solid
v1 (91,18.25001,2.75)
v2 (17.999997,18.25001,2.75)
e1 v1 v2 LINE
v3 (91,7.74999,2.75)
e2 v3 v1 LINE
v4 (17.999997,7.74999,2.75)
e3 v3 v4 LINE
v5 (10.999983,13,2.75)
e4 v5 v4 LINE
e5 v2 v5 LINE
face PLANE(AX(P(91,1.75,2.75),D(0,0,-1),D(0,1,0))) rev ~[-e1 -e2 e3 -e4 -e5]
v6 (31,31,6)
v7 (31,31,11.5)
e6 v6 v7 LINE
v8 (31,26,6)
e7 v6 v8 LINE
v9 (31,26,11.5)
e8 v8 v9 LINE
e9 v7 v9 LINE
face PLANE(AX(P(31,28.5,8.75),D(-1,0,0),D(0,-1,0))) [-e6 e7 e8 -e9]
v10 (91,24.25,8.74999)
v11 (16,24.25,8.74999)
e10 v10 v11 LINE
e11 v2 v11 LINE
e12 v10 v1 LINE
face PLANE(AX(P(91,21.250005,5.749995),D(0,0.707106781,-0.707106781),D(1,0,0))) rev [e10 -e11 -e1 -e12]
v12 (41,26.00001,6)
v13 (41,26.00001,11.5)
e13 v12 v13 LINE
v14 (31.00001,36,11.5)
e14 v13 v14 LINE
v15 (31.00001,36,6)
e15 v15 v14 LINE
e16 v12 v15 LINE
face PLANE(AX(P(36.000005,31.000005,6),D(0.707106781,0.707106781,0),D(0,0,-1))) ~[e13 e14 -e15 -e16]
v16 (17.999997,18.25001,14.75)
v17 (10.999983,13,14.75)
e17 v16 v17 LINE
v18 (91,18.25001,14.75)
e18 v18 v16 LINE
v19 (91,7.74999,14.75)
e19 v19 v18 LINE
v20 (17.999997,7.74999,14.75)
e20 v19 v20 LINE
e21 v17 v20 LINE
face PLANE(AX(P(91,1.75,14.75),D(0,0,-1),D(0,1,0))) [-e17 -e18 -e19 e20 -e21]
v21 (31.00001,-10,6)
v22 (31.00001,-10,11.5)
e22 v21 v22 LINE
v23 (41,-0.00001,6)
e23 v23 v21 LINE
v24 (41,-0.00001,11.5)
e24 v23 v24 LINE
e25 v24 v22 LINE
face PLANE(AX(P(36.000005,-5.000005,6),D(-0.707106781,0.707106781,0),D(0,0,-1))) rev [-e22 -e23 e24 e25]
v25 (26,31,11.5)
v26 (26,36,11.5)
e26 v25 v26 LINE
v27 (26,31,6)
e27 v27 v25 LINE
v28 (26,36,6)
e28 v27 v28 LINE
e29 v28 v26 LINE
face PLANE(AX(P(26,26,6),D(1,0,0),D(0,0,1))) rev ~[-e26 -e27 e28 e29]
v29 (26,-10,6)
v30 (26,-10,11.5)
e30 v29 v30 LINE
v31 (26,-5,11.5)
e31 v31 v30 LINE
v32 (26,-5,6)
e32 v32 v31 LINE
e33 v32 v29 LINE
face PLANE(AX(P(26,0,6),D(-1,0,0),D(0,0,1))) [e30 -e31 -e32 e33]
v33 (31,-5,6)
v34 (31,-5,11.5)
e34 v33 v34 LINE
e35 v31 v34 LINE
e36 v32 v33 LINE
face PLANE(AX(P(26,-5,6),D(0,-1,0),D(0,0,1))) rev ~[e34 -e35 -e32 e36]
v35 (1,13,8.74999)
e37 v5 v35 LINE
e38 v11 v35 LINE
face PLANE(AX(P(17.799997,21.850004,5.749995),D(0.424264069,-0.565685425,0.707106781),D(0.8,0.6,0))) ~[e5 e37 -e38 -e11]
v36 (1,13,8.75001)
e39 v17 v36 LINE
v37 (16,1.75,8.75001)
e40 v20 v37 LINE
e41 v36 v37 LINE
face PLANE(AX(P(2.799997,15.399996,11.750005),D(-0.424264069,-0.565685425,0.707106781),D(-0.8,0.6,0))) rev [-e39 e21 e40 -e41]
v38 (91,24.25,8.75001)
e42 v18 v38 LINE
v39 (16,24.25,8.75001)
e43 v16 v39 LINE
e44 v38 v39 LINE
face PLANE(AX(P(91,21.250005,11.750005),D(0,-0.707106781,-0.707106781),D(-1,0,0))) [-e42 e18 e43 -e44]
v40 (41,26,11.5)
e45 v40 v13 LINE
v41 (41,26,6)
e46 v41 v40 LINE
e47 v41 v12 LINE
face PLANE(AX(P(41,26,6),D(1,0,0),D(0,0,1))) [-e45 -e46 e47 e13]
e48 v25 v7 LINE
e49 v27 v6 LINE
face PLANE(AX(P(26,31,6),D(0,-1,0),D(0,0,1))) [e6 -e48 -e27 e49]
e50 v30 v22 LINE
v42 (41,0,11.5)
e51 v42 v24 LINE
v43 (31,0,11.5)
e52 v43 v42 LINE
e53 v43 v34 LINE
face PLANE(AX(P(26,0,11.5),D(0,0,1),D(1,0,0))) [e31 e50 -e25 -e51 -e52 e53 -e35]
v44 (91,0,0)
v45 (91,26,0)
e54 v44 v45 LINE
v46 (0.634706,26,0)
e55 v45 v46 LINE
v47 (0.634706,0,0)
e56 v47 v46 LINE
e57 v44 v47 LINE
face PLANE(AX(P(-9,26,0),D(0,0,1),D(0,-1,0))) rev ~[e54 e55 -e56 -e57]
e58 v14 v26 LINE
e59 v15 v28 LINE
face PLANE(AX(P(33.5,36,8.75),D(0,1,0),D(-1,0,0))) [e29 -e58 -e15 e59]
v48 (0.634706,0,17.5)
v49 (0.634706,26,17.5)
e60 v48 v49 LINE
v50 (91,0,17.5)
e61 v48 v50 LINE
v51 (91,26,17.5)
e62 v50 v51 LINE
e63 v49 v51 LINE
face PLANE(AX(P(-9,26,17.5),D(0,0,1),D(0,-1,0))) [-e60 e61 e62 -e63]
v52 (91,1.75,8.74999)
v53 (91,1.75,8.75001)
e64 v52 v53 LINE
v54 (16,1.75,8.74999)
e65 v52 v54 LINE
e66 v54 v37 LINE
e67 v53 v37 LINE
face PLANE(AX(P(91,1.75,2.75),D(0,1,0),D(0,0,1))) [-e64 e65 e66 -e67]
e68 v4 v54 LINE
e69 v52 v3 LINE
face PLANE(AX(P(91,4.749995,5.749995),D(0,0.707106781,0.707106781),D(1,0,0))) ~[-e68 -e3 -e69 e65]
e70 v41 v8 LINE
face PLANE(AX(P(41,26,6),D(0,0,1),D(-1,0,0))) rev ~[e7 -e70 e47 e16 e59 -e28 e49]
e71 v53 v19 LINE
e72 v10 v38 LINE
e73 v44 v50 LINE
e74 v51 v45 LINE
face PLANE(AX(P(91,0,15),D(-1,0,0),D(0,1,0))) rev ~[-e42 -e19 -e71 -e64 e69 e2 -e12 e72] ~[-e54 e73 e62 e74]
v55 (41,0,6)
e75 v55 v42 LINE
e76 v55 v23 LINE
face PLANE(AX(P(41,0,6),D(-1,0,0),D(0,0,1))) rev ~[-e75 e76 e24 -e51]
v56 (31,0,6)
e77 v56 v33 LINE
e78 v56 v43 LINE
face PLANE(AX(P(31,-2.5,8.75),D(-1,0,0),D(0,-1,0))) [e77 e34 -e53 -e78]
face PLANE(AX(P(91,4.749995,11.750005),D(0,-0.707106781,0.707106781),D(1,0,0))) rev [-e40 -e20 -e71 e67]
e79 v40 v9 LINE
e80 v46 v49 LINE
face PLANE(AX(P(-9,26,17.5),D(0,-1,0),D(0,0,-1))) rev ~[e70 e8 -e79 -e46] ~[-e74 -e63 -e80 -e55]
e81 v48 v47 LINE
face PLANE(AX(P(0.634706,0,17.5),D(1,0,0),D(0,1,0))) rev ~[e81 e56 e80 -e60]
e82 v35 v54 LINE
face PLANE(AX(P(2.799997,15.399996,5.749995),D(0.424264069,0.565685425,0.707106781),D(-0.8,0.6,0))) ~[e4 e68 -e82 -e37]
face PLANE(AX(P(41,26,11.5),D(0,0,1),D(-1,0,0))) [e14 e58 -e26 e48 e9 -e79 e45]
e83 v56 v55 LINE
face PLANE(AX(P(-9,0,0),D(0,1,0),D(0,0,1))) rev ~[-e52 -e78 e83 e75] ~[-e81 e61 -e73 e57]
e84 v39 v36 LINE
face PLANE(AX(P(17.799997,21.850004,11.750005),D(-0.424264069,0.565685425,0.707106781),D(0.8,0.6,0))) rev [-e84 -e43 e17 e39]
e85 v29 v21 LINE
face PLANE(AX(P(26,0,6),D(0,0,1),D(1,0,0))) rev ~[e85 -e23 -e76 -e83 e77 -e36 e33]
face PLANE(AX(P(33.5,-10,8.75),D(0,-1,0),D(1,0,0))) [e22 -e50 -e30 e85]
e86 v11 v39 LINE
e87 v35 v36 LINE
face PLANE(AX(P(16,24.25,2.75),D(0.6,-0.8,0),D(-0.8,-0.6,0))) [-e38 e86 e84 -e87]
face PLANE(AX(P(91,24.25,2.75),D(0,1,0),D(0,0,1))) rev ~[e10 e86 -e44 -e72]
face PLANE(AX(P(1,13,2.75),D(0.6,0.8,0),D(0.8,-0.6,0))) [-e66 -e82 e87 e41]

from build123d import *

# Parameters (mm, degrees)
F1_DEPTH  = 10
F2_W      = 21
F2_H      = 10
F3_DEPTH  = 9
F4_DEPTH  = 2
F5_DEPTH  = 3
F6_DEPTH  = 5
F7_DEPTH  = 2.5
F8_W      = 22.5
F8_H      = 12
F9_DEPTH  = 75
F11_DEPTH = 12
F12_SIZE  = 5.99999
F13_W     = 15
F13_H     = 5.5
F14_DEPTH = 10
F15_SIZE  = 9.99999
F16_W     = 5
F16_H     = 5.5
F17_DEPTH = 5
F18_W     = 15
F18_H     = 5.5
F19_DEPTH = 10
F20_SIZE  = 9.99999
F21_W     = 5
F21_H     = 5.5
F22_DEPTH = 5
F23_DEPTH = 5
F24_SIZE  = 5
F25_DEPTH = 5
F29_DEPTH = 25


# Not quite as in the source:
# - a fillet or chamfer is up to 0.001 mm smaller than in the source, because OpenCascade refuses the exact size
# - a feature of the source that left no trace in its solid (it failed there, or was rolled back) is left out


with BuildPart() as f1:
    # F0 (on Top) → F1 (new body)
    with BuildSketch(Plane.XY):
        Polygon((0, 10.5), (0, 0), (15, 0), align=None)
        Polygon((0, 10.5), (15, 0), (91, 0), (91, 21), (15, 21), align=None)
        Polygon((0, 21), (0, 10.5), (15, 21), align=None)
    extrude(amount=F1_DEPTH)

    # F2 (on face) → F3 (join)
    with BuildSketch(Plane(origin=(0, 0, 0), x_dir=(0, -1, 0), z_dir=(-1, 0, 0))):
        with Locations((-10.5, 5)):
            Rectangle(F2_W, F2_H)
    extrude(amount=F3_DEPTH)

    # F4 (add): a face of the model
    f4_faces = [f1.faces().sort_by_distance(p)[0] for p in [
        (41, 10.5, 10),
    ]]
    extrude(f4_faces, amount=F4_DEPTH)

    # F5 (add): a face of the model
    f5_faces = [f1.faces().sort_by_distance(p)[0] for p in [
        (41, 10.5, 12),
    ]]
    extrude(f5_faces, amount=F5_DEPTH)

    # F6 (add): a face of the model
    f6_faces = [f1.faces().sort_by_distance(p)[0] for p in [
        (41, 21, 7.5),
    ]]
    extrude(f6_faces, amount=F6_DEPTH)

    # F7 (add): a face of the model
    f7_faces = [f1.faces().sort_by_distance(p)[0] for p in [
        (41, 13, 15),
    ]]
    extrude(f7_faces, amount=F7_DEPTH)

    # F8 (on face) → F9 (cut)
    with BuildSketch(Plane.YZ.offset(91)):
        with Locations((13, 8.75)):
            Rectangle(F8_W, F8_H)
    extrude(amount=-F9_DEPTH, mode=Mode.SUBTRACT)

    # F10 (on face) → F11 (cut)
    with BuildSketch(Plane.XY.offset(2.75)):
        Polygon((16, 1.75), (16, 13), (1, 13), align=None)
        Polygon((1, 13), (16, 13), (16, 24.25), align=None)
    extrude(amount=F11_DEPTH, mode=Mode.SUBTRACT)

    # F12 (size 6 in the source; OpenCascade refuses exactly that, so slightly less here)
    f12_edges = [f1.edges().sort_by_distance(p)[0] for p in [
        (8.5, 7.375, 14.75),
        (8.5, 18.625, 14.75),
        (8.5, 7.375, 2.75),
        (8.5, 18.625, 2.75),
        (53.5, 1.75, 2.75),
        (53.5, 1.75, 14.75),
        (53.5, 24.25, 14.75),
        (53.5, 24.25, 2.75),
    ]]
    chamfer(f12_edges, length=F12_SIZE)

    # F13 (on face) → F14 (join)
    with BuildSketch(Plane(origin=(0, 26, 0), x_dir=(-1, 0, 0), z_dir=(0, 1, 0))):
        with Locations((-33.5, 8.75)):
            Rectangle(F13_W, F13_H)
    extrude(amount=F14_DEPTH)

    # F15 (size 10 in the source; OpenCascade refuses exactly that, so slightly less here)
    f15_edges = [f1.edges().sort_by_distance(p)[0] for p in [
        (41, 36, 8.75),
    ]]
    chamfer(f15_edges, length=F15_SIZE)

    # F16 (on face) → F17 (cut)
    with BuildSketch(Plane(origin=(26, 0, 0), x_dir=(0, -1, 0), z_dir=(-1, 0, 0))):
        with Locations((-28.5, 8.75)):
            Rectangle(F16_W, F16_H)
    extrude(amount=-F17_DEPTH, mode=Mode.SUBTRACT)

    # F18 (on face) → F19 (join)
    with BuildSketch(Plane.XZ):
        with Locations((33.5, 8.75)):
            Rectangle(F18_W, F18_H)
    extrude(amount=F19_DEPTH)

    # F20 (size 10 in the source; OpenCascade refuses exactly that, so slightly less here)
    f20_edges = [f1.edges().sort_by_distance(p)[0] for p in [
        (41, -10, 8.75),
    ]]
    chamfer(f20_edges, length=F20_SIZE)

    # F21 (on face) → F22 (cut)
    with BuildSketch(Plane(origin=(26, 0, 0), x_dir=(0, -1, 0), z_dir=(-1, 0, 0))):
        with Locations((2.5, 8.75)):
            Rectangle(F21_W, F21_H)
    extrude(amount=-F22_DEPTH, mode=Mode.SUBTRACT)

    # F23 (add): a face of the model
    f23_faces = [f1.faces().sort_by_distance(p)[0] for p in [
        (-9, 13, 8.75),
    ]]
    extrude(f23_faces, amount=F23_DEPTH)

    # F24
    f24_edges = [f1.edges().sort_by_distance(p)[0] for p in [
        (-14, 26, 8.75),
        (-14, 13, 17.5),
        (-14, 0, 8.75),
        (-14, 13, 0),
    ]]
    chamfer(f24_edges, length=F24_SIZE)

    # F25 (add): a face of the model
    f25_faces = [f1.faces().sort_by_distance(p)[0] for p in [
        (-14, 13, 8.75),
    ]]
    extrude(f25_faces, amount=F25_DEPTH)

    # F28 (on face) → F29 (cut)
    with BuildSketch(Plane.XY.offset(17.5)):
        Polygon((-36.3743491471, 0), (0.634705736, 0), (0.634705736, 13), (0.634705736, 34.4582907856), (-36.3743491471, 34.4582907856), align=None)
    extrude(amount=-F29_DEPTH, mode=Mode.SUBTRACT)


solid = f1.part
